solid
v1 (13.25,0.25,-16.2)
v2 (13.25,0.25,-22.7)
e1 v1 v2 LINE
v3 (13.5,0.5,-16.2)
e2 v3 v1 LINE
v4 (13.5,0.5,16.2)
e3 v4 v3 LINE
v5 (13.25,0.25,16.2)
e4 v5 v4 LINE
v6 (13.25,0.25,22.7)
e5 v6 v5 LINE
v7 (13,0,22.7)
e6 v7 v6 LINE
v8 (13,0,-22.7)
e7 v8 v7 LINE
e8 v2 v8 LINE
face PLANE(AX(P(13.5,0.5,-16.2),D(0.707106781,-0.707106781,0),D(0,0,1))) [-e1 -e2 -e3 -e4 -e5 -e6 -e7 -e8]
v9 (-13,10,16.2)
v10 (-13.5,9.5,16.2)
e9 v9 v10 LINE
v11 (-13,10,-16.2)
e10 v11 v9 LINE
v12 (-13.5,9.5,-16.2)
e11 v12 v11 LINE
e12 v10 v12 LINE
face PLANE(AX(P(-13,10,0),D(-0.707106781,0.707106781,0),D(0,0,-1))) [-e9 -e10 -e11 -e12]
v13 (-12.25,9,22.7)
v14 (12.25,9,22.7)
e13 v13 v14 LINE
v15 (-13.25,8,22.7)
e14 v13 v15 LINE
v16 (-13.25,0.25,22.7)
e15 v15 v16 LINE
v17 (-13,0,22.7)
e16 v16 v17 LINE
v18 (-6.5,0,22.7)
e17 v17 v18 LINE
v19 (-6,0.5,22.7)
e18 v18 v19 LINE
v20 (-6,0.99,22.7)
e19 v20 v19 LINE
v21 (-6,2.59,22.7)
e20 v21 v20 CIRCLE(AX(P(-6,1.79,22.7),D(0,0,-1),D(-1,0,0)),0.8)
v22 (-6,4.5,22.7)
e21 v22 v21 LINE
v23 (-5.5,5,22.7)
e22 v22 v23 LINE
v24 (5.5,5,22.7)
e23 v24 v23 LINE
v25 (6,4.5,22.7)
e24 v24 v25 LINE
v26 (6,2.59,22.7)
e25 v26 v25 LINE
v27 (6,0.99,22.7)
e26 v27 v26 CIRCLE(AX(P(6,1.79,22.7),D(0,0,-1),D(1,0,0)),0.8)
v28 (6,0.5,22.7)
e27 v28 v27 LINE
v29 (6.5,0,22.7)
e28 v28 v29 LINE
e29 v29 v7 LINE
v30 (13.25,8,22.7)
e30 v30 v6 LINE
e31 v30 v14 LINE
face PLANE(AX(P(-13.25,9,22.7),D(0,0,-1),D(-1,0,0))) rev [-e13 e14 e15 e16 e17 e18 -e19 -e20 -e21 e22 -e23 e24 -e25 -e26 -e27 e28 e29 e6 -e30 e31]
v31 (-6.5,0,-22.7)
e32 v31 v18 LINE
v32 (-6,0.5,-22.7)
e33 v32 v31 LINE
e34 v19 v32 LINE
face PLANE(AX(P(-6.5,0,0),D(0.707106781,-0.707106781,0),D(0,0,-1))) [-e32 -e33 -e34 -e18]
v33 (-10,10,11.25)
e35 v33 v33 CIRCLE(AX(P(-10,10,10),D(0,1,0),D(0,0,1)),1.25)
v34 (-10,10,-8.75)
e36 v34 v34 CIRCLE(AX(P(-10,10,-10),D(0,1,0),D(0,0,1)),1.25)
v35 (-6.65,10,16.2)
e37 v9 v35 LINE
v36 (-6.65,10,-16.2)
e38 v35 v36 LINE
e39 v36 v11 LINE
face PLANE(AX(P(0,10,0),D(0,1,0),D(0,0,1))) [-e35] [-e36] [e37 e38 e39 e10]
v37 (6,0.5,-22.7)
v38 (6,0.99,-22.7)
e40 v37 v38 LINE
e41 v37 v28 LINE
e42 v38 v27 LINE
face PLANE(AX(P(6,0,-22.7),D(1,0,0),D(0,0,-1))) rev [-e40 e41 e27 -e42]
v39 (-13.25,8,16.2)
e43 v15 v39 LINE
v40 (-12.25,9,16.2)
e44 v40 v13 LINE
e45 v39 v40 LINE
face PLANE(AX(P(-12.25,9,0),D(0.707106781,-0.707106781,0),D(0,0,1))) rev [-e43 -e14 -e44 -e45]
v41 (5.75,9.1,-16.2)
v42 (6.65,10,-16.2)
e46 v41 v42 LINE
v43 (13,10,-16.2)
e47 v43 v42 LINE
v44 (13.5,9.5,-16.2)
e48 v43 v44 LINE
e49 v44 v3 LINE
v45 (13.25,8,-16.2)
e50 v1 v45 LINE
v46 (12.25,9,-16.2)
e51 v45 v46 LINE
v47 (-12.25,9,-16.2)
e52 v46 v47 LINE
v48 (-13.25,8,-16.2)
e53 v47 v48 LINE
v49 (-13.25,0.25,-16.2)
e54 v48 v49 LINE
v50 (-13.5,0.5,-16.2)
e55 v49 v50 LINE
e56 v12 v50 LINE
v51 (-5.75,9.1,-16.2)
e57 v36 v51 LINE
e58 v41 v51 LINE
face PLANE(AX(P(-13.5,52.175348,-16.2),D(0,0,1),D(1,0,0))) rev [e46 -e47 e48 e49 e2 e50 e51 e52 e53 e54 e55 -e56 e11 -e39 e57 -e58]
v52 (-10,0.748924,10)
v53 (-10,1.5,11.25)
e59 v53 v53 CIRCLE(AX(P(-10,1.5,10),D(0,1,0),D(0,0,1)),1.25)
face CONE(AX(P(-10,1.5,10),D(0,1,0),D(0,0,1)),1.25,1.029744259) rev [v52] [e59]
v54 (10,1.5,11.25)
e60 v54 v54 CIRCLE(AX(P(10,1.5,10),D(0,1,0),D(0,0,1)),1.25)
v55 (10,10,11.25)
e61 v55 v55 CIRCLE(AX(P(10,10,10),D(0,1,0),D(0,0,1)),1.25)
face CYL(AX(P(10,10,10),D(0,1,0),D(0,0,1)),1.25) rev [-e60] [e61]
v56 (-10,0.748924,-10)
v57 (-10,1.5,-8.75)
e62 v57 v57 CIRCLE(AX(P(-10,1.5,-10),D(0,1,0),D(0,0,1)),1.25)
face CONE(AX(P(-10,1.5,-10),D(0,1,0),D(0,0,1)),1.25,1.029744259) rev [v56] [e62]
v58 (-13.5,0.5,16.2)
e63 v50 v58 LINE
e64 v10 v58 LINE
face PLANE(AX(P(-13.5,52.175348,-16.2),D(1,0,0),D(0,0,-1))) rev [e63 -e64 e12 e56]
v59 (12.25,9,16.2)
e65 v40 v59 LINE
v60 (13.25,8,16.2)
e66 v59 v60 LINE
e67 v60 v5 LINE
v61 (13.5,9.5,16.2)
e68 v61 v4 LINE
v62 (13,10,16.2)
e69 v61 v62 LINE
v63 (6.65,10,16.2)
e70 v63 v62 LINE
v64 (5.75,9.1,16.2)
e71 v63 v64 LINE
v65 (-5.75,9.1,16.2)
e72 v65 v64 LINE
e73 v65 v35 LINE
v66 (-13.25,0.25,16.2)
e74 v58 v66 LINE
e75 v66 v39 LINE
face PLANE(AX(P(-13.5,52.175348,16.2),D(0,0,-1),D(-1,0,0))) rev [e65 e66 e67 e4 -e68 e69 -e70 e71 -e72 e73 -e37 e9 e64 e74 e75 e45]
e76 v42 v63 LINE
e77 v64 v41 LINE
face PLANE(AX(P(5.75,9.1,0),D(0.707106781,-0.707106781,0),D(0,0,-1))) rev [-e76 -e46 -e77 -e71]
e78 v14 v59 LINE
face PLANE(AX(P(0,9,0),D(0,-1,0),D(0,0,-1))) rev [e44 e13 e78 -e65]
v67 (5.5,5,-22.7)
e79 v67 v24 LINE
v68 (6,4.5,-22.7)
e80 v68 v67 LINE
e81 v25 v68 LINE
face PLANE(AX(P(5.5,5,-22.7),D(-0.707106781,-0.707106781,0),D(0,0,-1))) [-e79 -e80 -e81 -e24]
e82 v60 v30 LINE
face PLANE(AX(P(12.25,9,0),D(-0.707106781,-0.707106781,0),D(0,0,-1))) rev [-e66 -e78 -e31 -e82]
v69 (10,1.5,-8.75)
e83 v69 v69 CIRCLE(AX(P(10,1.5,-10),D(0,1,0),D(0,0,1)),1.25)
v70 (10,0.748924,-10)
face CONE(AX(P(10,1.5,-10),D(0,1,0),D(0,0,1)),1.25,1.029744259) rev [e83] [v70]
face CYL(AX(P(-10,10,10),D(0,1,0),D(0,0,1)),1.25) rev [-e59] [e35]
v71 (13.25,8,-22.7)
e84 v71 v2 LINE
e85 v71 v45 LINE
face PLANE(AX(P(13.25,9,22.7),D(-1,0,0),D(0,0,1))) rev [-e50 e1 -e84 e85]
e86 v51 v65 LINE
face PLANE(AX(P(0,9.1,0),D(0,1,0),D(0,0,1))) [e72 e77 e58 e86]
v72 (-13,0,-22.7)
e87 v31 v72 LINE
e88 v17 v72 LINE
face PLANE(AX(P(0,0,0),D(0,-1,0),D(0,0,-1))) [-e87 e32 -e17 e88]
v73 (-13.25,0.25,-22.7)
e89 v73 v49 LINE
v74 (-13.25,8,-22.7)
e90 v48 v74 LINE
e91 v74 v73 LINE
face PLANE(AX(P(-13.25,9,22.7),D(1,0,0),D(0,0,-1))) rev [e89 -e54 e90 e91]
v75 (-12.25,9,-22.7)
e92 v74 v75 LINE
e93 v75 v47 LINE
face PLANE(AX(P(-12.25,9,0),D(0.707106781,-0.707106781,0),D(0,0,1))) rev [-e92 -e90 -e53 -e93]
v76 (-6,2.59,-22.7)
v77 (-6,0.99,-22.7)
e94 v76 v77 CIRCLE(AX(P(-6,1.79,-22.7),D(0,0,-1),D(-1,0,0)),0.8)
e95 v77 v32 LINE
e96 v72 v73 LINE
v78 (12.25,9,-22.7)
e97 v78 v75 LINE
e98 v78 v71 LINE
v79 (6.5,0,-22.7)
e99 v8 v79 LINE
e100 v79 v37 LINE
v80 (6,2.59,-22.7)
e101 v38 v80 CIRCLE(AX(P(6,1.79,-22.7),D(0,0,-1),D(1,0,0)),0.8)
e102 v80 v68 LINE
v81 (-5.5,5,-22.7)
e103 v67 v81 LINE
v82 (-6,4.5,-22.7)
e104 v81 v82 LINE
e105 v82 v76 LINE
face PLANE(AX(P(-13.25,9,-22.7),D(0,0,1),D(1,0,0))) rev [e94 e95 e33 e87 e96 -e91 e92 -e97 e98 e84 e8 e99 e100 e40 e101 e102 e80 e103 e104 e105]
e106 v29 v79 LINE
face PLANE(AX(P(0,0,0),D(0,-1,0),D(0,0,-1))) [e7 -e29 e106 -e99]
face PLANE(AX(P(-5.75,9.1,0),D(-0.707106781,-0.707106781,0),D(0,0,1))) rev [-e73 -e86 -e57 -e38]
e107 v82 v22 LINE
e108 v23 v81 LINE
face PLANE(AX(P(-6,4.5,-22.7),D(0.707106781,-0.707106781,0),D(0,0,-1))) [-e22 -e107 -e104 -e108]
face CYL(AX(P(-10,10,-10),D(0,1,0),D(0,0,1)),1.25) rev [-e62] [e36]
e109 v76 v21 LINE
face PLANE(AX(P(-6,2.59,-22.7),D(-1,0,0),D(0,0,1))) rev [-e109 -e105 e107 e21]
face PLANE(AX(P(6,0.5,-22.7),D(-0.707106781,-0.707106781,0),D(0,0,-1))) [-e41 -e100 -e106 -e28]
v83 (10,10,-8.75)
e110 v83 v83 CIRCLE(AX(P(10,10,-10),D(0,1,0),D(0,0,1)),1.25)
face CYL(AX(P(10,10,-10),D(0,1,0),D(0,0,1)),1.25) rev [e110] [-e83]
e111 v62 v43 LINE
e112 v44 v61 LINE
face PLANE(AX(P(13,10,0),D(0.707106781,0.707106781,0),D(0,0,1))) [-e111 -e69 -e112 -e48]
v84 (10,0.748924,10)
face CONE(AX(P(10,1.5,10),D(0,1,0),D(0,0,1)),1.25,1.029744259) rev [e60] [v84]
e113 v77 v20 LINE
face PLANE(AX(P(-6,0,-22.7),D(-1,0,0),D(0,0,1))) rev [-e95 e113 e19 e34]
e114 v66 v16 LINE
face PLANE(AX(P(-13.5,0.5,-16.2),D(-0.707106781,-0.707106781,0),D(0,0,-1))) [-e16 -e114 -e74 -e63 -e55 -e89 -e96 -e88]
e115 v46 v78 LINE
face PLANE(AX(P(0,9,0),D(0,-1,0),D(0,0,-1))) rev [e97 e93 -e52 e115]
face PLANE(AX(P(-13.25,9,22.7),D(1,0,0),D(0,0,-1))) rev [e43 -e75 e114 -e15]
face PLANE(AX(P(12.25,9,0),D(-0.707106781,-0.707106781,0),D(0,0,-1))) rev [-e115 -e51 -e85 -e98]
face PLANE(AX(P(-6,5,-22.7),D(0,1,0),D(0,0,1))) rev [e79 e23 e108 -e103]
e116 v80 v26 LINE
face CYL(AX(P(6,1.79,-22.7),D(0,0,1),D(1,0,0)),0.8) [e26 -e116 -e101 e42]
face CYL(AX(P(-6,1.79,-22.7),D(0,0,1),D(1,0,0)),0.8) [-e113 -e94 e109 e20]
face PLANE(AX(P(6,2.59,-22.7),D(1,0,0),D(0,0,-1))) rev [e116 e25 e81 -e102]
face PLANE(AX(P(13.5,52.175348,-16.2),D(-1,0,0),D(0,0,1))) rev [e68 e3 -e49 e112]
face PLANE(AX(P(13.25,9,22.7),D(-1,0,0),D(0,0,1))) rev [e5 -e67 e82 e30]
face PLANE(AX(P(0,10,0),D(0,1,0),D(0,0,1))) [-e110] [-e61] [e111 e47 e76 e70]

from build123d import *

# Parameters (mm, degrees)
MAINBLOCKSKETCH_W              = 26.5
MAINBLOCKSKETCH_H              = 45.4
MAINBLOCK_DEPTH                = 9
FACEDSURFACESKETCH_W           = 27
FACEDSURFACESKETCH_H           = 32.4
FACEDSURFACE_DEPTH             = 10
M3X0_5_TAPPED_HOLE1_D          = 2.5
M3X0_5_TAPPED_HOLE1_DEPTH      = 8.5
M3X0_5_TAPPED_HOLE1_TIP        = 0.751075774
RAIL_SLOT_DEPTH                = 29.240750698
RAIL_SLOT_DEPTH_BACK           = 29.240750698
INTERNAL_DIP_SKETCH_W          = 13.5
INTERNAL_DIP_SKETCH_H          = 32.4
INTERNAL_DIP_DEPTH             = 0.9
INTERNAL_CHAMFER_SIZE          = 0.5
COSMETIC_CHAMFERS_SIZE         = 1
SMALLER_COSMETIC_CHAMFERS_SIZE = 0.5


with BuildPart() as part:
    # MainBlockSketch → MainBlock (new body)
    with BuildSketch(Plane(origin=(0, 0, 0), x_dir=(1, 0, 0), z_dir=(0, 1, 0))):
        Rectangle(MAINBLOCKSKETCH_W, MAINBLOCKSKETCH_H)
    extrude(amount=MAINBLOCK_DEPTH)

    # FacedSurfaceSketch → FacedSurface (add)
    with BuildSketch(Plane(origin=(0, 0, 0), x_dir=(1, 0, 0), z_dir=(0, 1, 0))):
        Rectangle(FACEDSURFACESKETCH_W, FACEDSURFACESKETCH_H)
    extrude(amount=FACEDSURFACE_DEPTH)

    # M3x0.5 Tapped Hole1
    with Locations(Plane(origin=(0, 10, 0), x_dir=(1, 0, 0), z_dir=(0, 1, 0))):
        with Locations((-10, 10), (10, 10), (10, -10), (-10, -10)):
            Hole(M3X0_5_TAPPED_HOLE1_D / 2, depth=M3X0_5_TAPPED_HOLE1_DEPTH)
            with Locations((0, 0, -(M3X0_5_TAPPED_HOLE1_DEPTH + M3X0_5_TAPPED_HOLE1_TIP / 2))):  # 118° drill point
                Cone(0, M3X0_5_TAPPED_HOLE1_D / 2, M3X0_5_TAPPED_HOLE1_TIP, mode=Mode.SUBTRACT)

    # RailSlotSketch → Rail Slot (cut, two sides: drawn at the far end of the back side and taken through both)
    with BuildSketch(Plane.XY.offset(-RAIL_SLOT_DEPTH_BACK)):
        with BuildLine():
            Line((-6, 2.59), (-6, 5))
            Line((-6, 5), (6, 5))
            Line((6, 5), (6, 2.59))
            ThreePointArc((6, 2.59), (5.2, 1.79), (6, 0.99))
            Line((6, 0.99), (6, 0))
            Line((6, 0), (-6, 0))
            Line((-6, 0), (-6, 0.99))
            ThreePointArc((-6, 0.99), (-5.2, 1.79), (-6, 2.59))
        make_face()
    extrude(amount=RAIL_SLOT_DEPTH + RAIL_SLOT_DEPTH_BACK, mode=Mode.SUBTRACT)

    # Internal Dip Sketch → Internal Dip (cut)
    with BuildSketch(Plane(origin=(0, 10, 0), x_dir=(1, 0, 0), z_dir=(0, 1, 0))):
        Rectangle(INTERNAL_DIP_SKETCH_W, INTERNAL_DIP_SKETCH_H)
    extrude(amount=-INTERNAL_DIP_DEPTH, mode=Mode.SUBTRACT)

    # Internal Chamfer
    internal_chamfer_edges = [part.edges().sort_by_distance(p)[0] for p in [
        (6, 5, 0),
        (-6, 5, 0),
    ]]
    chamfer(internal_chamfer_edges, length=INTERNAL_CHAMFER_SIZE)

    # Cosmetic Chamfers
    # the kernel refuses this chamfer: 1 mm, written as the material it adds along each edge
    with BuildSketch(Plane(origin=(-6.75, 9.1, 16.2), x_dir=(0.9996219169112968, -0.027495876610585623, 0), z_dir=(0, 0, -1))) as cosmetic_chamfers_piece_1_section:
        Polygon((COSMETIC_CHAMFERS_SIZE * 0.999621916911, -COSMETIC_CHAMFERS_SIZE * 0.0274958766106), (-COSMETIC_CHAMFERS_SIZE * 0.0274958766106, -COSMETIC_CHAMFERS_SIZE * 0.999621916911), (0, 0), align=None)
    cosmetic_chamfers_piece_1 = extrude(amount=32.4, mode=Mode.PRIVATE)
    cosmetic_chamfers_piece_1 = split(cosmetic_chamfers_piece_1, bisect_by=Plane(origin=(-6.414099253, 10, 0), z_dir=(0, -1, 0)), keep=Keep.TOP, mode=Mode.PRIVATE)
    add(cosmetic_chamfers_piece_1)
    with BuildSketch(Plane(origin=(6.75, 9.1, -16.2), x_dir=(0.02749587661058651, 0.9996219169112968, 0), z_dir=(0, 0, 1))) as cosmetic_chamfers_piece_2_section:
        Polygon((COSMETIC_CHAMFERS_SIZE * 0.999621916911, COSMETIC_CHAMFERS_SIZE * 0.0274958766106), (-COSMETIC_CHAMFERS_SIZE * 0.0274958766106, COSMETIC_CHAMFERS_SIZE * 0.999621916911), (0, 0), align=None)
    cosmetic_chamfers_piece_2 = extrude(amount=32.4, mode=Mode.PRIVATE)
    cosmetic_chamfers_piece_2 = split(cosmetic_chamfers_piece_2, bisect_by=Plane(origin=(6.414099253, 10, 0), z_dir=(0, -1, 0)), keep=Keep.TOP, mode=Mode.PRIVATE)
    add(cosmetic_chamfers_piece_2)
    # the kernel refuses this chamfer: 1 mm, written as the material it takes off along each edge
    with BuildSketch(Plane(origin=(13.25, 9, 25.271682988), x_dir=(0.027495876610585623, -0.9996219169112968, 0), z_dir=(0, 0, -1))) as cosmetic_chamfers_2_piece_1:
        Polygon((COSMETIC_CHAMFERS_SIZE * 0.999621916911, COSMETIC_CHAMFERS_SIZE * 0.0274958766106), (-COSMETIC_CHAMFERS_SIZE * 0.0274958766106, COSMETIC_CHAMFERS_SIZE * 0.999621916911), (0, 0), align=None)
    extrude(amount=9.071682988, mode=Mode.SUBTRACT)
    with BuildSketch(Plane(origin=(-13.25, 9, 16.2), x_dir=(0.9996219169112968, 0.027495876610585647, 0), z_dir=(0, 0, 1)), Plane(origin=(-13.25, 9, -25.271682988), x_dir=(0.9996219169112968, 0.027495876610585647, 0), z_dir=(0, 0, 1)), Plane(origin=(13.25, 9, -16.2), x_dir=(-0.9996219169112968, 0.027495876610585647, 0), z_dir=(0, 0, -1))) as cosmetic_chamfers_2_piece_2:
        Polygon((COSMETIC_CHAMFERS_SIZE * 0.999621916911, -COSMETIC_CHAMFERS_SIZE * 0.0274958766106), (-COSMETIC_CHAMFERS_SIZE * 0.0274958766106, -COSMETIC_CHAMFERS_SIZE * 0.999621916911), (0, 0), align=None)
    extrude(amount=9.071682988, mode=Mode.SUBTRACT)

    # Smaller Cosmetic Chamfers
    smaller_cosmetic_chamfers_edges = [part.edges().sort_by_distance(p)[0] for p in [
        (13.5, 10, 0),
        (-13.5, 10, 0),
        (-13.5, 0, 0),
        (13.5, 0, 0),
        (6, 0, 0),
        (-6, 0, 0),
    ]]
    chamfer(smaller_cosmetic_chamfers_edges, length=SMALLER_COSMETIC_CHAMFERS_SIZE)


solid = part.part
